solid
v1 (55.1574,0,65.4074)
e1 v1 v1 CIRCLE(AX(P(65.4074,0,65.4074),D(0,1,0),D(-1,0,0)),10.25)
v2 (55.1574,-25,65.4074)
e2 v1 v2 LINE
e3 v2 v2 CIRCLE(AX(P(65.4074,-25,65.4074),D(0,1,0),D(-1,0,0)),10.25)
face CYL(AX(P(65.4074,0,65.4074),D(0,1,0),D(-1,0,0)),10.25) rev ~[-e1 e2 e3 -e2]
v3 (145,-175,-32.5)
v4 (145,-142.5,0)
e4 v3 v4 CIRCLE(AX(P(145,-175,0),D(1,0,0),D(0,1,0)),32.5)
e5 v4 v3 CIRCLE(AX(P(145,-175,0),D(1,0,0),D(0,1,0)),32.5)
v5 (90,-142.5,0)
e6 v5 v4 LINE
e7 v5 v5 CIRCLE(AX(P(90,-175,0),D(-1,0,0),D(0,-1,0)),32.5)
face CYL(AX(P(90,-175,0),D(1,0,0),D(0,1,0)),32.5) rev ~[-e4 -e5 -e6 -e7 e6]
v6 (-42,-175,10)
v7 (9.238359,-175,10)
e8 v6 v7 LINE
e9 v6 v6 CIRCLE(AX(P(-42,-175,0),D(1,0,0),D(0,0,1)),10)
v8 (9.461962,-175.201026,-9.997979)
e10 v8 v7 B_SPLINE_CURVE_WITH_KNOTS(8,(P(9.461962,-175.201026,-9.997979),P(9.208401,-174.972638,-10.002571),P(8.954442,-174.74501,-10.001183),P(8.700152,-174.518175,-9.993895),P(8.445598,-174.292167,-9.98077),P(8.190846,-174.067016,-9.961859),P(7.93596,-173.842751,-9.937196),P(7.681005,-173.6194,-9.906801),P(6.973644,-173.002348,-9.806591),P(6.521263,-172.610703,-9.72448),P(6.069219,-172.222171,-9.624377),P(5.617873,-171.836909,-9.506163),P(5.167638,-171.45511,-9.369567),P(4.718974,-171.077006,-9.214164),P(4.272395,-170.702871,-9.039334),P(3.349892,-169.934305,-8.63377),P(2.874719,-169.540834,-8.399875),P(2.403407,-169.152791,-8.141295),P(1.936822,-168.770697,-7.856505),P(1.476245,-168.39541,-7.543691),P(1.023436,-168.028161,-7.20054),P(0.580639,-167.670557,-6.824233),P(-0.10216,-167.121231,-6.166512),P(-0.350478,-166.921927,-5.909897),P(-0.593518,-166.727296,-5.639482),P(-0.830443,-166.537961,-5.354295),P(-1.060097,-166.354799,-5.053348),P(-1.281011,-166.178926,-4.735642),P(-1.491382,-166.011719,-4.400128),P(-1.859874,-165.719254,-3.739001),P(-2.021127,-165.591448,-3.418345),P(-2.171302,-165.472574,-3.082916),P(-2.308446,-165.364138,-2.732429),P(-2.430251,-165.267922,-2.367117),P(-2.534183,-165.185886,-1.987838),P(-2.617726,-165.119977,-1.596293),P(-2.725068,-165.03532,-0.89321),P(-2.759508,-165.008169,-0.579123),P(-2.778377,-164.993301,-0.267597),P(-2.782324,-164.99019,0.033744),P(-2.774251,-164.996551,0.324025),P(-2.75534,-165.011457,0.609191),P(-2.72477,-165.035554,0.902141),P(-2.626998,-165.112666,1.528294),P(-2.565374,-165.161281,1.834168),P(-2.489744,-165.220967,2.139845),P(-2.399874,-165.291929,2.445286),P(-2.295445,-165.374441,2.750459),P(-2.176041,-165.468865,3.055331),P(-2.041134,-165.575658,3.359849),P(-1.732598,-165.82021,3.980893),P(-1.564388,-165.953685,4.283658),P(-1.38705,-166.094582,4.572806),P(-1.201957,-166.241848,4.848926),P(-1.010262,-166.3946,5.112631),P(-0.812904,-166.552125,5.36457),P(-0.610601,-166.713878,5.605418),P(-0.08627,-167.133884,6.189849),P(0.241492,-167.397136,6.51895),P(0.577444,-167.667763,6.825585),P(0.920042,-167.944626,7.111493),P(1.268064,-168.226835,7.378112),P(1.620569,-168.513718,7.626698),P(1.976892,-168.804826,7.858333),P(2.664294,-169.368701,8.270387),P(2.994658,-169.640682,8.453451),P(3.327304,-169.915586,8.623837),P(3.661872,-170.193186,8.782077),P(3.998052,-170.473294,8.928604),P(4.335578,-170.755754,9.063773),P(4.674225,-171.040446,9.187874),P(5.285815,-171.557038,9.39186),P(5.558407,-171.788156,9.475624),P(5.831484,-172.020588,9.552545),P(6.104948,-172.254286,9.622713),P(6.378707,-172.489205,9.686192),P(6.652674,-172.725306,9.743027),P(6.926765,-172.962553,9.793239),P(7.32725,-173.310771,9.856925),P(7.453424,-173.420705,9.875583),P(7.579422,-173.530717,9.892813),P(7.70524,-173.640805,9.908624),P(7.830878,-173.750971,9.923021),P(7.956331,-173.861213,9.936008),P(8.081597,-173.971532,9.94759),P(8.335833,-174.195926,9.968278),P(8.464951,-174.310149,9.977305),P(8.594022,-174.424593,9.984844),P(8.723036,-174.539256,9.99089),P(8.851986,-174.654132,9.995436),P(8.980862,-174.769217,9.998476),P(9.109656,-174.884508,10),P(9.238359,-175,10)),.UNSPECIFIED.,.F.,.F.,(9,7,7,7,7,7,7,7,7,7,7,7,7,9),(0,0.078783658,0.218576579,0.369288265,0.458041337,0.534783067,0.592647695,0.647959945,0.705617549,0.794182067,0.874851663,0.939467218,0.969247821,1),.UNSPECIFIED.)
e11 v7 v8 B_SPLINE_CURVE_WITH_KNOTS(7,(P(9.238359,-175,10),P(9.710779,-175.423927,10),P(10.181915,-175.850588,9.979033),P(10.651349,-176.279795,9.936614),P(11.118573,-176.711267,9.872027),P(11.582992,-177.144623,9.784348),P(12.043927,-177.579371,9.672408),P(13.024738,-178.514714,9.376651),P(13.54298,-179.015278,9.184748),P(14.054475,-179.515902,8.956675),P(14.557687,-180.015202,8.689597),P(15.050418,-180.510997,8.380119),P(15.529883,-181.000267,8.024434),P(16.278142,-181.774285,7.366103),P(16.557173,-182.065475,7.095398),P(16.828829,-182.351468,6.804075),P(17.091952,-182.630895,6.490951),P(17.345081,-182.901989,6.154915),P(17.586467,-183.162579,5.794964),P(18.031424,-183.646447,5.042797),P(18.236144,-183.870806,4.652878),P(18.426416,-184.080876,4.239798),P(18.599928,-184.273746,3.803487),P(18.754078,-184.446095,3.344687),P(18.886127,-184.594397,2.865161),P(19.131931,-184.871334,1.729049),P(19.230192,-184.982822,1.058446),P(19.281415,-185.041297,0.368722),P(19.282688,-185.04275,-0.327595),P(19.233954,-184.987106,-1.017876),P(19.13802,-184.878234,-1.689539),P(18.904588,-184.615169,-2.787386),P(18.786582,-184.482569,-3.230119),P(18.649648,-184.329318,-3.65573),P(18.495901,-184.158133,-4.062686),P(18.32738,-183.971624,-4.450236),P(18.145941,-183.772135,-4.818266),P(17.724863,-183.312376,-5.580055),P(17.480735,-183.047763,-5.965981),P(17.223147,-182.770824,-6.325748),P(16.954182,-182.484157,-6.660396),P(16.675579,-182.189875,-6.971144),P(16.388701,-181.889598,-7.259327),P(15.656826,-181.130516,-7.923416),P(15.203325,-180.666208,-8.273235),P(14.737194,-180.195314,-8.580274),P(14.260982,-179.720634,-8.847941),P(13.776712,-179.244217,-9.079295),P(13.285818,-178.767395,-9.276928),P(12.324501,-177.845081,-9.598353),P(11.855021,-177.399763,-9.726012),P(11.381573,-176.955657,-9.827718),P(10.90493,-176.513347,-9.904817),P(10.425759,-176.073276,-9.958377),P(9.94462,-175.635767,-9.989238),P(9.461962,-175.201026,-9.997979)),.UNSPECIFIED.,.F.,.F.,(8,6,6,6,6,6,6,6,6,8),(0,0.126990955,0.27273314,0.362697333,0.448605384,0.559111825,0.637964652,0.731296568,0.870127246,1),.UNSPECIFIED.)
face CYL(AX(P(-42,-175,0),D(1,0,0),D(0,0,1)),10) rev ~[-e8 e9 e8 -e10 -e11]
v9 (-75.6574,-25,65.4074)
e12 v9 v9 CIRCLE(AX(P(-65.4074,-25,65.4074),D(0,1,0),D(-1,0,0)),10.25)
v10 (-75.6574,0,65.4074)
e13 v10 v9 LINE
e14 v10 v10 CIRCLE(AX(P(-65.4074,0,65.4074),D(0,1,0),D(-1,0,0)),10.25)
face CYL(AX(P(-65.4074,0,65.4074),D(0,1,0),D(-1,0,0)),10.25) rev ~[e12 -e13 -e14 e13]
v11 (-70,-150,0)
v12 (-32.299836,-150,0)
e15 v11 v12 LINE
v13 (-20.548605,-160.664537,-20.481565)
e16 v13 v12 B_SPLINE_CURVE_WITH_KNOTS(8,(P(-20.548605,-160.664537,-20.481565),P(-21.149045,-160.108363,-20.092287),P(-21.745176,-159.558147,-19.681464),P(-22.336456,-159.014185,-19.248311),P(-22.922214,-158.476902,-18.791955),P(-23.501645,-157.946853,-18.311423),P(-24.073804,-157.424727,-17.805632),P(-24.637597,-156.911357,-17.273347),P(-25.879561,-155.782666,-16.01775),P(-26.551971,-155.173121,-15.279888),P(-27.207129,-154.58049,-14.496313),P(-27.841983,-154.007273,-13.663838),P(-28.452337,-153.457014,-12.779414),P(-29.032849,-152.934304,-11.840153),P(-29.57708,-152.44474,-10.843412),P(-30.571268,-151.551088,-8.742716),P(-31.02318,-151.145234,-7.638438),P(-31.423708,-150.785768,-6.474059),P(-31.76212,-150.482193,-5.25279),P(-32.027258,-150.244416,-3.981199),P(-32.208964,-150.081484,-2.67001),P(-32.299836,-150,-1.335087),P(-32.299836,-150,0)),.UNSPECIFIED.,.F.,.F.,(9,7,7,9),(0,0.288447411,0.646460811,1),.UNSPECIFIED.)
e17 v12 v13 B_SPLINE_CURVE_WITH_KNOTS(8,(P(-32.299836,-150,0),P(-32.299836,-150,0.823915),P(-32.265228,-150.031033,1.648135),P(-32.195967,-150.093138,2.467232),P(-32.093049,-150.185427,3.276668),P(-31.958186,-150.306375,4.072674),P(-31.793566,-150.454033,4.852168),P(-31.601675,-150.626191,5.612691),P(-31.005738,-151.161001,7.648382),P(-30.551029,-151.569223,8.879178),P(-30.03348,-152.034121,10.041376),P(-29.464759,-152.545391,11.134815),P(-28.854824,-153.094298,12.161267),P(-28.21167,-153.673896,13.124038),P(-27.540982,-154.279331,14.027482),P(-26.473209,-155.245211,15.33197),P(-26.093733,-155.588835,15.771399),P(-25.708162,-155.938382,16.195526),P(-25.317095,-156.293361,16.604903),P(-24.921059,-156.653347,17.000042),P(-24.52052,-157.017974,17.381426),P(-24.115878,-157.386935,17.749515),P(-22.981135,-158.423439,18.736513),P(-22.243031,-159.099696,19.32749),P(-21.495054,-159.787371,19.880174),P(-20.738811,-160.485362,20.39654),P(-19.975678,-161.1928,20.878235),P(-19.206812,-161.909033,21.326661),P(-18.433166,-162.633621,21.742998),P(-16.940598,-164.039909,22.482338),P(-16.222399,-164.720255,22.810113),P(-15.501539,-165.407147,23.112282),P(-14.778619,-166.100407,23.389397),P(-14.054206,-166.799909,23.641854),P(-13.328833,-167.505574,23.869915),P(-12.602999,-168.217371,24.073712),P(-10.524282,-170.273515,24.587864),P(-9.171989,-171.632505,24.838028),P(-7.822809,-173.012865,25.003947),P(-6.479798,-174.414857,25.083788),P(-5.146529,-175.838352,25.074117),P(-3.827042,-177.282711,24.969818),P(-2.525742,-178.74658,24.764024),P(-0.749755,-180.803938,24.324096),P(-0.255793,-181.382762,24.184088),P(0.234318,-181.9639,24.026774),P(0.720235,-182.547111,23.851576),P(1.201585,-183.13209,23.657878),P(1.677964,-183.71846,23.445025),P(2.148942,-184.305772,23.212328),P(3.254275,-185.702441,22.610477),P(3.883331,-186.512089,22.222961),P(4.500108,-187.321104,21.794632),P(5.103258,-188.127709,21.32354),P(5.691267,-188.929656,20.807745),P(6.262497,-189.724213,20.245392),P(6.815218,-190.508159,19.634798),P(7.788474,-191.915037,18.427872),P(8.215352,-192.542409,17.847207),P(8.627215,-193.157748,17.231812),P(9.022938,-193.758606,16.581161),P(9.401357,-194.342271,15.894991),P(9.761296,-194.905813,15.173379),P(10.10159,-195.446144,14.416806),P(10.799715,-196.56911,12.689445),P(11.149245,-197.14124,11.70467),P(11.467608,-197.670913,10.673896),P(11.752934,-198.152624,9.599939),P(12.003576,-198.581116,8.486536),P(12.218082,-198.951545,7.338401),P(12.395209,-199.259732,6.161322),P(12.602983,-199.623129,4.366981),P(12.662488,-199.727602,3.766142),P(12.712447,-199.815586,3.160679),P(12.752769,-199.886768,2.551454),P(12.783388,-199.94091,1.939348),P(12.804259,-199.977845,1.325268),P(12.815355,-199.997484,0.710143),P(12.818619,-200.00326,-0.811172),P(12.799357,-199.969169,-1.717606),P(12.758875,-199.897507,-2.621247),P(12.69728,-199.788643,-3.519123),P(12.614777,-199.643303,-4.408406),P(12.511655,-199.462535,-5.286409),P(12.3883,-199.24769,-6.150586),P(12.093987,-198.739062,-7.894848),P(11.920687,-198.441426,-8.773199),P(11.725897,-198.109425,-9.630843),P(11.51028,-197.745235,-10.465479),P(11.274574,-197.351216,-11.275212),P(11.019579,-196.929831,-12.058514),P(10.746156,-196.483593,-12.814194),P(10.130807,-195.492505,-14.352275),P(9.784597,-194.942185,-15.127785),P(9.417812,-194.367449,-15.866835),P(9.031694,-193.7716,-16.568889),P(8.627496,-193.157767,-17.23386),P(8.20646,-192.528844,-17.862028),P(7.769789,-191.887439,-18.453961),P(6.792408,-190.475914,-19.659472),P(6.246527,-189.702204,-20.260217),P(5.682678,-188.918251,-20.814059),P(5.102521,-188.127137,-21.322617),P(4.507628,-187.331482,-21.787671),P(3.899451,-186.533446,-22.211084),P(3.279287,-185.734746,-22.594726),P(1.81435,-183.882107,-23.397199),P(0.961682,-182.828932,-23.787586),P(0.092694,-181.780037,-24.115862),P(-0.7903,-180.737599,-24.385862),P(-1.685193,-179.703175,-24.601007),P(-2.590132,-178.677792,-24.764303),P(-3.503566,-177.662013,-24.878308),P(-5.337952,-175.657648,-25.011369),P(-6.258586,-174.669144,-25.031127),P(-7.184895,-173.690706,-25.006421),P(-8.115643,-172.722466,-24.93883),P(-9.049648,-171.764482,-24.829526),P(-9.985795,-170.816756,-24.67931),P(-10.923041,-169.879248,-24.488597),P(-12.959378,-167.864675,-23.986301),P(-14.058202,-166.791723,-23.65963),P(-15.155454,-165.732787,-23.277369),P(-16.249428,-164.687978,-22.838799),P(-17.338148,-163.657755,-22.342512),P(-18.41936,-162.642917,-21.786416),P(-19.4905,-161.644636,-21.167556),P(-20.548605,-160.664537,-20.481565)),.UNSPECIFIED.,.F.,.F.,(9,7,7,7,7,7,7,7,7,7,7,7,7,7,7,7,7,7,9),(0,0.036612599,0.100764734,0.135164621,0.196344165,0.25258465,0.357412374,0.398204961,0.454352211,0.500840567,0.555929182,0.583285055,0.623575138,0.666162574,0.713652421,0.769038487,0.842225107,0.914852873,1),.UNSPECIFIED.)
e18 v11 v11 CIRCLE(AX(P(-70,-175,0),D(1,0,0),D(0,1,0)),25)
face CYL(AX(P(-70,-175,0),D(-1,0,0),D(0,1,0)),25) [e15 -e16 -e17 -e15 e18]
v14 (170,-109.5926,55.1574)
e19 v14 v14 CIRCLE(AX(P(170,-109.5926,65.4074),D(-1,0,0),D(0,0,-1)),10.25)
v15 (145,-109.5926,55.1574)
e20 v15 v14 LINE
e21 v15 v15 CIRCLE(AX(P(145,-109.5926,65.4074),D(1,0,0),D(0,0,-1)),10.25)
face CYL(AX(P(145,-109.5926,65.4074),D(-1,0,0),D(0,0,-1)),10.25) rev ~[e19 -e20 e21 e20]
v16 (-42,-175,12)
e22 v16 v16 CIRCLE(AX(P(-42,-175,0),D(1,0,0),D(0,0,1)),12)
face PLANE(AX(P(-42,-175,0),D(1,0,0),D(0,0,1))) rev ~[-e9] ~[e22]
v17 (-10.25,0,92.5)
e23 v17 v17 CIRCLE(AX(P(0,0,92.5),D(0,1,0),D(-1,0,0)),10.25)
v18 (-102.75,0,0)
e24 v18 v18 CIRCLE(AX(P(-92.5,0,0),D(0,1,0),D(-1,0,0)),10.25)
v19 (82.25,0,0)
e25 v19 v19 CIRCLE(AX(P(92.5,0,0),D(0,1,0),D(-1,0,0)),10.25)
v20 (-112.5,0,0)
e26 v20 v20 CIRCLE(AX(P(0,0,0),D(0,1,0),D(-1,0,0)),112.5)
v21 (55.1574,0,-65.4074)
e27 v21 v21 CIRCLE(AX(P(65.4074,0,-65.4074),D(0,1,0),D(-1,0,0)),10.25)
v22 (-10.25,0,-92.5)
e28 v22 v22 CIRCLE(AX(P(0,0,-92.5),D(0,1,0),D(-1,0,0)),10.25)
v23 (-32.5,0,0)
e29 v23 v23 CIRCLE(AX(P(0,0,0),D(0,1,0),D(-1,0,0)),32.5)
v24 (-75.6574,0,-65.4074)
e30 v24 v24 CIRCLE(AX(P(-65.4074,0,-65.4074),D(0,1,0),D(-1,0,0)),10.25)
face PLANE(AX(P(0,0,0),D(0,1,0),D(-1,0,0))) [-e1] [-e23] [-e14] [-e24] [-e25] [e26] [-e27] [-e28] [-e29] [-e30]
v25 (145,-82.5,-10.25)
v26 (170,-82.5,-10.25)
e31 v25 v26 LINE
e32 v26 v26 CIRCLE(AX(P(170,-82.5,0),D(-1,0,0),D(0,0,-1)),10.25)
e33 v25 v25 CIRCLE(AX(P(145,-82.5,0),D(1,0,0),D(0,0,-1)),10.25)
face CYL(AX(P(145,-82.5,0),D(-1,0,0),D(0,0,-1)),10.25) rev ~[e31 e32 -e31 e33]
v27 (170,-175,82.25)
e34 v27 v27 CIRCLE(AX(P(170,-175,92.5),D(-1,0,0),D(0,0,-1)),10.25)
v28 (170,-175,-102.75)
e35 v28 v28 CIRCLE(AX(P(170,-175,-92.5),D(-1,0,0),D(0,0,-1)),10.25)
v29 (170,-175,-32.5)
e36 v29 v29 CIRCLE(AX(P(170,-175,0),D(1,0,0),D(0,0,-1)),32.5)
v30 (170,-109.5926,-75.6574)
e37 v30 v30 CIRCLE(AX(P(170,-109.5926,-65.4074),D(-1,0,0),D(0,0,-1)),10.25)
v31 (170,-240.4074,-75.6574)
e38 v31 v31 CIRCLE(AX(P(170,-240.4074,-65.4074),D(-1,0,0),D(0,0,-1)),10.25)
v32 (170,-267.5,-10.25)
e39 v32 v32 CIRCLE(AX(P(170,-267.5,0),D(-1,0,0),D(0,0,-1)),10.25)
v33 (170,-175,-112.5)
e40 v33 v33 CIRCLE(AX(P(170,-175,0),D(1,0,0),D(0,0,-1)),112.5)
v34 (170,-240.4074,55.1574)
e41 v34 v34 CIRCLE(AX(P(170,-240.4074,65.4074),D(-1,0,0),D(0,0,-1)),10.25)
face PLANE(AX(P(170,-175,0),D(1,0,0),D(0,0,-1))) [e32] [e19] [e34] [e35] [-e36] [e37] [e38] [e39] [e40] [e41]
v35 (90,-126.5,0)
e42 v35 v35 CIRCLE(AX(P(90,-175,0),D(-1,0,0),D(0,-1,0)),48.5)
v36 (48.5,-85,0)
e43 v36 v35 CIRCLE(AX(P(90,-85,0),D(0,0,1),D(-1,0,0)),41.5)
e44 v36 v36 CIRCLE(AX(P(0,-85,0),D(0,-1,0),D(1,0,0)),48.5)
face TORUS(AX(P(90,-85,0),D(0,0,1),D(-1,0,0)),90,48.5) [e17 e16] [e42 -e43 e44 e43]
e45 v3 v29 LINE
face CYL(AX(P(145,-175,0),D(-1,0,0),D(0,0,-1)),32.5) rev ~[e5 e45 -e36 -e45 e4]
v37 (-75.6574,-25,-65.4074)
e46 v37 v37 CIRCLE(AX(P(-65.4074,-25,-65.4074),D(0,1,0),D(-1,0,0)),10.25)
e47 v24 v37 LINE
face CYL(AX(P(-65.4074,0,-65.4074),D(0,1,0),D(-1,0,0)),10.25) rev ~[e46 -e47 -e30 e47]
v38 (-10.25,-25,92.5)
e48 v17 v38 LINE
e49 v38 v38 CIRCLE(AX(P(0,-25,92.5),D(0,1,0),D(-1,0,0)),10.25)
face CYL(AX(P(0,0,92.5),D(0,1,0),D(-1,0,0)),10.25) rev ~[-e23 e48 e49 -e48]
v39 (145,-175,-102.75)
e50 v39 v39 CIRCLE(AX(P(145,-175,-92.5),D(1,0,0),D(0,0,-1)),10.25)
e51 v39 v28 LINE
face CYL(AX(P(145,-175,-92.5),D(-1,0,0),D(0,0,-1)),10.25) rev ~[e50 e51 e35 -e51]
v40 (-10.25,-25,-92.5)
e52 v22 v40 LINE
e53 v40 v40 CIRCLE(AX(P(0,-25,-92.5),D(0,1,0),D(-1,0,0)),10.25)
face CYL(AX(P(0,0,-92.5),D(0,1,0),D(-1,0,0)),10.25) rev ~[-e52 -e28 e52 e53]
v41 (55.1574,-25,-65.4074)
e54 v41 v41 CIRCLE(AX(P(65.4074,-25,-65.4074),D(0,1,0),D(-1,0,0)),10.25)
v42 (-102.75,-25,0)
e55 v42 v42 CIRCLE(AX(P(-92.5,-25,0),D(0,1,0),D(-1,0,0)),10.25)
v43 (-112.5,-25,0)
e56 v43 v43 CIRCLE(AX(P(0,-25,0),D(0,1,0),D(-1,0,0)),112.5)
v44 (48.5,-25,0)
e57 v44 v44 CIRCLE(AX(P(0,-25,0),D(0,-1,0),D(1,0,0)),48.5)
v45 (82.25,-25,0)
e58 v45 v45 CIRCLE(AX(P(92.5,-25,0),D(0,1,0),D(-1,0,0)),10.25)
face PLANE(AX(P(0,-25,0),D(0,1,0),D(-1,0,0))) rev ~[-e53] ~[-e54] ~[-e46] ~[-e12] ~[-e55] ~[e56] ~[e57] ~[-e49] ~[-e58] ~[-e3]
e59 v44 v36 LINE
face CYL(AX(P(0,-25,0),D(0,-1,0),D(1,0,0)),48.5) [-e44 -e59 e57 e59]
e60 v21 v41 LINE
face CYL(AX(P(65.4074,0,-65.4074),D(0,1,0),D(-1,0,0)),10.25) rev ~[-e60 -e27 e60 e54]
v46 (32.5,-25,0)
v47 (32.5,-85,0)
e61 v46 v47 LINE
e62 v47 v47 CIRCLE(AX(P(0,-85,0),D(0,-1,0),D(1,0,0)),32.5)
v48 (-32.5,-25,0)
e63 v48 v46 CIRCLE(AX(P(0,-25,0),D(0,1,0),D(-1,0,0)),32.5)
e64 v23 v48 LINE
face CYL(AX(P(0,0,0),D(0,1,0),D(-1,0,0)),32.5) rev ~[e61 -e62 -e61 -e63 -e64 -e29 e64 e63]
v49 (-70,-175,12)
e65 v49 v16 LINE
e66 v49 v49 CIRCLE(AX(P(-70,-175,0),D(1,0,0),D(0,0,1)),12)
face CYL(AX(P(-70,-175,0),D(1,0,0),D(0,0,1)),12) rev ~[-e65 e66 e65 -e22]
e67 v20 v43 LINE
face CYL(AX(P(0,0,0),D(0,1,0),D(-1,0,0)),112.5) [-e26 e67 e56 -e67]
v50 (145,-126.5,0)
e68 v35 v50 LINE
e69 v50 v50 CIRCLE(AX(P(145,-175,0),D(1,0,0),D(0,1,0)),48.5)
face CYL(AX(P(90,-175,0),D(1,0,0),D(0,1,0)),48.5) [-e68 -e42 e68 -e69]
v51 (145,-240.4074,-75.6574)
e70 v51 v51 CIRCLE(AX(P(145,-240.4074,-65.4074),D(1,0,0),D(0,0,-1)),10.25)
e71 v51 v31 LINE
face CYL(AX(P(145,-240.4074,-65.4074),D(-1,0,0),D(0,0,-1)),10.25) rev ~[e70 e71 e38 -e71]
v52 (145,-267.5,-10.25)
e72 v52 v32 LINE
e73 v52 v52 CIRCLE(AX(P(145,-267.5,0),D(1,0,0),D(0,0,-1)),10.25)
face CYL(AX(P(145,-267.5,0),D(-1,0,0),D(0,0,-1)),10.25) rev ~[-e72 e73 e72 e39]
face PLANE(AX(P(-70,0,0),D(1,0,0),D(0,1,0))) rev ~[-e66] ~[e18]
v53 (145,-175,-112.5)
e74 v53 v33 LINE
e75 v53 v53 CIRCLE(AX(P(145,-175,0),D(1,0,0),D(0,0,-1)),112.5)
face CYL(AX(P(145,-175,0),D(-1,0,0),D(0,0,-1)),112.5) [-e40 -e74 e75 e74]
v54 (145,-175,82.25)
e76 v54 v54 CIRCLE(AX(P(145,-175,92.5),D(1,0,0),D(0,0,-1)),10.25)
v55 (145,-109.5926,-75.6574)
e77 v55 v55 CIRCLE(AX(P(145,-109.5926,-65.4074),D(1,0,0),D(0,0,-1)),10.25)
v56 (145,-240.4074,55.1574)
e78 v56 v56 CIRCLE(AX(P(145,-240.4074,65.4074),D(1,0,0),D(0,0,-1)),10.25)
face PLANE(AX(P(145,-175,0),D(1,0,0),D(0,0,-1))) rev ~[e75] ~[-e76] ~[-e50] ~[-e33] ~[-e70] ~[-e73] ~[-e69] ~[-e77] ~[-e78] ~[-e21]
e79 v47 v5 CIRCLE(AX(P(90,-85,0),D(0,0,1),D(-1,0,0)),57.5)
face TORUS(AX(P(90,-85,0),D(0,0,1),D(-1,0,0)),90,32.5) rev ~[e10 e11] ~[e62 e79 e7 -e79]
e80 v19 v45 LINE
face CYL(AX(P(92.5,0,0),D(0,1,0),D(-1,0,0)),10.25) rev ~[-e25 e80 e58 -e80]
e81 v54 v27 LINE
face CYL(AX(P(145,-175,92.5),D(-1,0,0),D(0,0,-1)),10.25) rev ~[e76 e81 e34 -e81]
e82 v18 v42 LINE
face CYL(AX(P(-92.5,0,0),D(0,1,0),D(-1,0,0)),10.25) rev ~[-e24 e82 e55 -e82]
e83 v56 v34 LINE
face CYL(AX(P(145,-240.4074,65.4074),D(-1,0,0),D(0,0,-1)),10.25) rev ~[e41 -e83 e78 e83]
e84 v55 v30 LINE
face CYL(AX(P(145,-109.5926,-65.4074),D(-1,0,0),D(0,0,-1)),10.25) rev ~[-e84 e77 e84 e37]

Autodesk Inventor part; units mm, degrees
ref_plane "XZ Plane" through (0, 0, 0) normal (0, 1, 0) x (-1, 0, 0)
ref_plane "XY Plane" through (0, 0, 0) normal (0, 0, 1) x (1, 0, 0)
sketch "Sketch1" plane through (0, 0, 0) normal (0, 1, 0) x (-1, 0, 0)
  circle A0 centre (0, 0) radius 112.5
  circle A1 centre (0, 0) radius 92.5 construction
  circle A2 centre (0, 0) radius 32.5
  circle A3 centre (92.5, 0) radius 10.25
  line L0 (157.5, 0) -> (-157.5, 0) construction
  circle A4 centre (65.4074, 65.4074) radius 10.25
  circle A5 centre (0, 92.5) radius 10.25
  circle A6 centre (-65.4074, 65.4074) radius 10.25
  circle A7 centre (-92.5, 0) radius 10.25
  circle A8 centre (-65.4074, -65.4074) radius 10.25
  circle A9 centre (0, -92.5) radius 10.25
  circle A10 centre (65.4074, -65.4074) radius 10.25
  dimension "d1" = 185
  dimension "d0" = 225
  dimension "d2" = 65
  dimension "d3" = 20.5
  dimension "d6" = 360
extrude "Extrusion1" add sketch "Sketch1" against normal blind 25
sketch "Sketch2" plane through (0, 0, 0) normal (0, 0, 1) x (1, 0, 0)
  line L0 (-112.5, -25) -> (112.5, -25) projected
  line L1 (0, -25) -> (0, -85)
  line L2 (90, -175) -> (145, -175)
  arc A0 (0, -85) -> (90, -175) centre (90, -85) ccw
  line L3 (112.5, 0) -> (-112.5, 0) projected
  point P0 (0, 0)
  point P1 (0, -175)
  dimension "d13" = 145
  dimension "d14" = 90
  dimension "d27" = 175
sketch "Sketch3" plane through (0, -25, 0) normal (0, -1, 0) x (1, 0, 0)
  circle A0 centre (0, 0) radius 48.5
  circle A1 centre (0, 0) radius 32.5 projected
  dimension "d15" = 97
sweep "Sweep1" add profiles "Sketch3" path "Sketch2" path curves L1 A0 L2
sketch "Sketch4" plane through (145, -175, 0) normal (1, 0, 0) x (0, 0, -1)
  circle A0 centre (0, 0) radius 32.5 projected
  circle A1 centre (0, 0) radius 48.5 construction
  circle A2 centre (0, 0) radius 112.5
  circle A3 centre (0, 0) radius 92.5
  line L0 (0, 0) -> (0, 112.5) construction
  circle A4 centre (0, 92.5) radius 10.25
  circle A5 centre (-65.4074, 65.4074) radius 10.25
  circle A6 centre (-92.5, 0) radius 10.25
  circle A7 centre (-65.4074, -65.4074) radius 10.25
  circle A8 centre (0, -92.5) radius 10.25
  circle A9 centre (65.4074, -65.4074) radius 10.25
  circle A10 centre (92.5, 0) radius 10.25
  circle A11 centre (65.4074, 65.4074) radius 10.25
  point P0 (0, 175)
  dimension "d18" = 225
  dimension "d19" = 185
  dimension "d20" = 20.5
  dimension "d23" = 360
extrude "Extrusion2" add sketch "Sketch4" along normal blind 25 contours A2 | A10 A3 A9 A8 A7 A6 A5 A4 A11
ref_plane "Work Plane1" through (-70, 0, 0) normal (1, 0, 0) x (0, 1, 0)
sketch "Sketch6" plane through (-70, 0, 0) normal (1, 0, 0) x (0, 1, 0)
  line L0 (0, -112.5) -> (0, 112.5) construction
  circle A0 centre (-175, 0) radius 112.5 construction
  circle A1 centre (-175, 0) radius 48.5 construction
  line L1 (0, 0) -> (-287.5, 0) construction
  circle A2 centre (-175, 0) radius 25
  dimension "d29" = 175
  dimension "d30" = 50
extrude "Extrusion3" add sketch "Sketch6" along normal up to next
hole "Hole1" at (-70, -175, 0) direction (1, 0, 0) diameter 20 end through all counterbore diameter 24 counterbore depth 28
properties part number "LE-2.3"
